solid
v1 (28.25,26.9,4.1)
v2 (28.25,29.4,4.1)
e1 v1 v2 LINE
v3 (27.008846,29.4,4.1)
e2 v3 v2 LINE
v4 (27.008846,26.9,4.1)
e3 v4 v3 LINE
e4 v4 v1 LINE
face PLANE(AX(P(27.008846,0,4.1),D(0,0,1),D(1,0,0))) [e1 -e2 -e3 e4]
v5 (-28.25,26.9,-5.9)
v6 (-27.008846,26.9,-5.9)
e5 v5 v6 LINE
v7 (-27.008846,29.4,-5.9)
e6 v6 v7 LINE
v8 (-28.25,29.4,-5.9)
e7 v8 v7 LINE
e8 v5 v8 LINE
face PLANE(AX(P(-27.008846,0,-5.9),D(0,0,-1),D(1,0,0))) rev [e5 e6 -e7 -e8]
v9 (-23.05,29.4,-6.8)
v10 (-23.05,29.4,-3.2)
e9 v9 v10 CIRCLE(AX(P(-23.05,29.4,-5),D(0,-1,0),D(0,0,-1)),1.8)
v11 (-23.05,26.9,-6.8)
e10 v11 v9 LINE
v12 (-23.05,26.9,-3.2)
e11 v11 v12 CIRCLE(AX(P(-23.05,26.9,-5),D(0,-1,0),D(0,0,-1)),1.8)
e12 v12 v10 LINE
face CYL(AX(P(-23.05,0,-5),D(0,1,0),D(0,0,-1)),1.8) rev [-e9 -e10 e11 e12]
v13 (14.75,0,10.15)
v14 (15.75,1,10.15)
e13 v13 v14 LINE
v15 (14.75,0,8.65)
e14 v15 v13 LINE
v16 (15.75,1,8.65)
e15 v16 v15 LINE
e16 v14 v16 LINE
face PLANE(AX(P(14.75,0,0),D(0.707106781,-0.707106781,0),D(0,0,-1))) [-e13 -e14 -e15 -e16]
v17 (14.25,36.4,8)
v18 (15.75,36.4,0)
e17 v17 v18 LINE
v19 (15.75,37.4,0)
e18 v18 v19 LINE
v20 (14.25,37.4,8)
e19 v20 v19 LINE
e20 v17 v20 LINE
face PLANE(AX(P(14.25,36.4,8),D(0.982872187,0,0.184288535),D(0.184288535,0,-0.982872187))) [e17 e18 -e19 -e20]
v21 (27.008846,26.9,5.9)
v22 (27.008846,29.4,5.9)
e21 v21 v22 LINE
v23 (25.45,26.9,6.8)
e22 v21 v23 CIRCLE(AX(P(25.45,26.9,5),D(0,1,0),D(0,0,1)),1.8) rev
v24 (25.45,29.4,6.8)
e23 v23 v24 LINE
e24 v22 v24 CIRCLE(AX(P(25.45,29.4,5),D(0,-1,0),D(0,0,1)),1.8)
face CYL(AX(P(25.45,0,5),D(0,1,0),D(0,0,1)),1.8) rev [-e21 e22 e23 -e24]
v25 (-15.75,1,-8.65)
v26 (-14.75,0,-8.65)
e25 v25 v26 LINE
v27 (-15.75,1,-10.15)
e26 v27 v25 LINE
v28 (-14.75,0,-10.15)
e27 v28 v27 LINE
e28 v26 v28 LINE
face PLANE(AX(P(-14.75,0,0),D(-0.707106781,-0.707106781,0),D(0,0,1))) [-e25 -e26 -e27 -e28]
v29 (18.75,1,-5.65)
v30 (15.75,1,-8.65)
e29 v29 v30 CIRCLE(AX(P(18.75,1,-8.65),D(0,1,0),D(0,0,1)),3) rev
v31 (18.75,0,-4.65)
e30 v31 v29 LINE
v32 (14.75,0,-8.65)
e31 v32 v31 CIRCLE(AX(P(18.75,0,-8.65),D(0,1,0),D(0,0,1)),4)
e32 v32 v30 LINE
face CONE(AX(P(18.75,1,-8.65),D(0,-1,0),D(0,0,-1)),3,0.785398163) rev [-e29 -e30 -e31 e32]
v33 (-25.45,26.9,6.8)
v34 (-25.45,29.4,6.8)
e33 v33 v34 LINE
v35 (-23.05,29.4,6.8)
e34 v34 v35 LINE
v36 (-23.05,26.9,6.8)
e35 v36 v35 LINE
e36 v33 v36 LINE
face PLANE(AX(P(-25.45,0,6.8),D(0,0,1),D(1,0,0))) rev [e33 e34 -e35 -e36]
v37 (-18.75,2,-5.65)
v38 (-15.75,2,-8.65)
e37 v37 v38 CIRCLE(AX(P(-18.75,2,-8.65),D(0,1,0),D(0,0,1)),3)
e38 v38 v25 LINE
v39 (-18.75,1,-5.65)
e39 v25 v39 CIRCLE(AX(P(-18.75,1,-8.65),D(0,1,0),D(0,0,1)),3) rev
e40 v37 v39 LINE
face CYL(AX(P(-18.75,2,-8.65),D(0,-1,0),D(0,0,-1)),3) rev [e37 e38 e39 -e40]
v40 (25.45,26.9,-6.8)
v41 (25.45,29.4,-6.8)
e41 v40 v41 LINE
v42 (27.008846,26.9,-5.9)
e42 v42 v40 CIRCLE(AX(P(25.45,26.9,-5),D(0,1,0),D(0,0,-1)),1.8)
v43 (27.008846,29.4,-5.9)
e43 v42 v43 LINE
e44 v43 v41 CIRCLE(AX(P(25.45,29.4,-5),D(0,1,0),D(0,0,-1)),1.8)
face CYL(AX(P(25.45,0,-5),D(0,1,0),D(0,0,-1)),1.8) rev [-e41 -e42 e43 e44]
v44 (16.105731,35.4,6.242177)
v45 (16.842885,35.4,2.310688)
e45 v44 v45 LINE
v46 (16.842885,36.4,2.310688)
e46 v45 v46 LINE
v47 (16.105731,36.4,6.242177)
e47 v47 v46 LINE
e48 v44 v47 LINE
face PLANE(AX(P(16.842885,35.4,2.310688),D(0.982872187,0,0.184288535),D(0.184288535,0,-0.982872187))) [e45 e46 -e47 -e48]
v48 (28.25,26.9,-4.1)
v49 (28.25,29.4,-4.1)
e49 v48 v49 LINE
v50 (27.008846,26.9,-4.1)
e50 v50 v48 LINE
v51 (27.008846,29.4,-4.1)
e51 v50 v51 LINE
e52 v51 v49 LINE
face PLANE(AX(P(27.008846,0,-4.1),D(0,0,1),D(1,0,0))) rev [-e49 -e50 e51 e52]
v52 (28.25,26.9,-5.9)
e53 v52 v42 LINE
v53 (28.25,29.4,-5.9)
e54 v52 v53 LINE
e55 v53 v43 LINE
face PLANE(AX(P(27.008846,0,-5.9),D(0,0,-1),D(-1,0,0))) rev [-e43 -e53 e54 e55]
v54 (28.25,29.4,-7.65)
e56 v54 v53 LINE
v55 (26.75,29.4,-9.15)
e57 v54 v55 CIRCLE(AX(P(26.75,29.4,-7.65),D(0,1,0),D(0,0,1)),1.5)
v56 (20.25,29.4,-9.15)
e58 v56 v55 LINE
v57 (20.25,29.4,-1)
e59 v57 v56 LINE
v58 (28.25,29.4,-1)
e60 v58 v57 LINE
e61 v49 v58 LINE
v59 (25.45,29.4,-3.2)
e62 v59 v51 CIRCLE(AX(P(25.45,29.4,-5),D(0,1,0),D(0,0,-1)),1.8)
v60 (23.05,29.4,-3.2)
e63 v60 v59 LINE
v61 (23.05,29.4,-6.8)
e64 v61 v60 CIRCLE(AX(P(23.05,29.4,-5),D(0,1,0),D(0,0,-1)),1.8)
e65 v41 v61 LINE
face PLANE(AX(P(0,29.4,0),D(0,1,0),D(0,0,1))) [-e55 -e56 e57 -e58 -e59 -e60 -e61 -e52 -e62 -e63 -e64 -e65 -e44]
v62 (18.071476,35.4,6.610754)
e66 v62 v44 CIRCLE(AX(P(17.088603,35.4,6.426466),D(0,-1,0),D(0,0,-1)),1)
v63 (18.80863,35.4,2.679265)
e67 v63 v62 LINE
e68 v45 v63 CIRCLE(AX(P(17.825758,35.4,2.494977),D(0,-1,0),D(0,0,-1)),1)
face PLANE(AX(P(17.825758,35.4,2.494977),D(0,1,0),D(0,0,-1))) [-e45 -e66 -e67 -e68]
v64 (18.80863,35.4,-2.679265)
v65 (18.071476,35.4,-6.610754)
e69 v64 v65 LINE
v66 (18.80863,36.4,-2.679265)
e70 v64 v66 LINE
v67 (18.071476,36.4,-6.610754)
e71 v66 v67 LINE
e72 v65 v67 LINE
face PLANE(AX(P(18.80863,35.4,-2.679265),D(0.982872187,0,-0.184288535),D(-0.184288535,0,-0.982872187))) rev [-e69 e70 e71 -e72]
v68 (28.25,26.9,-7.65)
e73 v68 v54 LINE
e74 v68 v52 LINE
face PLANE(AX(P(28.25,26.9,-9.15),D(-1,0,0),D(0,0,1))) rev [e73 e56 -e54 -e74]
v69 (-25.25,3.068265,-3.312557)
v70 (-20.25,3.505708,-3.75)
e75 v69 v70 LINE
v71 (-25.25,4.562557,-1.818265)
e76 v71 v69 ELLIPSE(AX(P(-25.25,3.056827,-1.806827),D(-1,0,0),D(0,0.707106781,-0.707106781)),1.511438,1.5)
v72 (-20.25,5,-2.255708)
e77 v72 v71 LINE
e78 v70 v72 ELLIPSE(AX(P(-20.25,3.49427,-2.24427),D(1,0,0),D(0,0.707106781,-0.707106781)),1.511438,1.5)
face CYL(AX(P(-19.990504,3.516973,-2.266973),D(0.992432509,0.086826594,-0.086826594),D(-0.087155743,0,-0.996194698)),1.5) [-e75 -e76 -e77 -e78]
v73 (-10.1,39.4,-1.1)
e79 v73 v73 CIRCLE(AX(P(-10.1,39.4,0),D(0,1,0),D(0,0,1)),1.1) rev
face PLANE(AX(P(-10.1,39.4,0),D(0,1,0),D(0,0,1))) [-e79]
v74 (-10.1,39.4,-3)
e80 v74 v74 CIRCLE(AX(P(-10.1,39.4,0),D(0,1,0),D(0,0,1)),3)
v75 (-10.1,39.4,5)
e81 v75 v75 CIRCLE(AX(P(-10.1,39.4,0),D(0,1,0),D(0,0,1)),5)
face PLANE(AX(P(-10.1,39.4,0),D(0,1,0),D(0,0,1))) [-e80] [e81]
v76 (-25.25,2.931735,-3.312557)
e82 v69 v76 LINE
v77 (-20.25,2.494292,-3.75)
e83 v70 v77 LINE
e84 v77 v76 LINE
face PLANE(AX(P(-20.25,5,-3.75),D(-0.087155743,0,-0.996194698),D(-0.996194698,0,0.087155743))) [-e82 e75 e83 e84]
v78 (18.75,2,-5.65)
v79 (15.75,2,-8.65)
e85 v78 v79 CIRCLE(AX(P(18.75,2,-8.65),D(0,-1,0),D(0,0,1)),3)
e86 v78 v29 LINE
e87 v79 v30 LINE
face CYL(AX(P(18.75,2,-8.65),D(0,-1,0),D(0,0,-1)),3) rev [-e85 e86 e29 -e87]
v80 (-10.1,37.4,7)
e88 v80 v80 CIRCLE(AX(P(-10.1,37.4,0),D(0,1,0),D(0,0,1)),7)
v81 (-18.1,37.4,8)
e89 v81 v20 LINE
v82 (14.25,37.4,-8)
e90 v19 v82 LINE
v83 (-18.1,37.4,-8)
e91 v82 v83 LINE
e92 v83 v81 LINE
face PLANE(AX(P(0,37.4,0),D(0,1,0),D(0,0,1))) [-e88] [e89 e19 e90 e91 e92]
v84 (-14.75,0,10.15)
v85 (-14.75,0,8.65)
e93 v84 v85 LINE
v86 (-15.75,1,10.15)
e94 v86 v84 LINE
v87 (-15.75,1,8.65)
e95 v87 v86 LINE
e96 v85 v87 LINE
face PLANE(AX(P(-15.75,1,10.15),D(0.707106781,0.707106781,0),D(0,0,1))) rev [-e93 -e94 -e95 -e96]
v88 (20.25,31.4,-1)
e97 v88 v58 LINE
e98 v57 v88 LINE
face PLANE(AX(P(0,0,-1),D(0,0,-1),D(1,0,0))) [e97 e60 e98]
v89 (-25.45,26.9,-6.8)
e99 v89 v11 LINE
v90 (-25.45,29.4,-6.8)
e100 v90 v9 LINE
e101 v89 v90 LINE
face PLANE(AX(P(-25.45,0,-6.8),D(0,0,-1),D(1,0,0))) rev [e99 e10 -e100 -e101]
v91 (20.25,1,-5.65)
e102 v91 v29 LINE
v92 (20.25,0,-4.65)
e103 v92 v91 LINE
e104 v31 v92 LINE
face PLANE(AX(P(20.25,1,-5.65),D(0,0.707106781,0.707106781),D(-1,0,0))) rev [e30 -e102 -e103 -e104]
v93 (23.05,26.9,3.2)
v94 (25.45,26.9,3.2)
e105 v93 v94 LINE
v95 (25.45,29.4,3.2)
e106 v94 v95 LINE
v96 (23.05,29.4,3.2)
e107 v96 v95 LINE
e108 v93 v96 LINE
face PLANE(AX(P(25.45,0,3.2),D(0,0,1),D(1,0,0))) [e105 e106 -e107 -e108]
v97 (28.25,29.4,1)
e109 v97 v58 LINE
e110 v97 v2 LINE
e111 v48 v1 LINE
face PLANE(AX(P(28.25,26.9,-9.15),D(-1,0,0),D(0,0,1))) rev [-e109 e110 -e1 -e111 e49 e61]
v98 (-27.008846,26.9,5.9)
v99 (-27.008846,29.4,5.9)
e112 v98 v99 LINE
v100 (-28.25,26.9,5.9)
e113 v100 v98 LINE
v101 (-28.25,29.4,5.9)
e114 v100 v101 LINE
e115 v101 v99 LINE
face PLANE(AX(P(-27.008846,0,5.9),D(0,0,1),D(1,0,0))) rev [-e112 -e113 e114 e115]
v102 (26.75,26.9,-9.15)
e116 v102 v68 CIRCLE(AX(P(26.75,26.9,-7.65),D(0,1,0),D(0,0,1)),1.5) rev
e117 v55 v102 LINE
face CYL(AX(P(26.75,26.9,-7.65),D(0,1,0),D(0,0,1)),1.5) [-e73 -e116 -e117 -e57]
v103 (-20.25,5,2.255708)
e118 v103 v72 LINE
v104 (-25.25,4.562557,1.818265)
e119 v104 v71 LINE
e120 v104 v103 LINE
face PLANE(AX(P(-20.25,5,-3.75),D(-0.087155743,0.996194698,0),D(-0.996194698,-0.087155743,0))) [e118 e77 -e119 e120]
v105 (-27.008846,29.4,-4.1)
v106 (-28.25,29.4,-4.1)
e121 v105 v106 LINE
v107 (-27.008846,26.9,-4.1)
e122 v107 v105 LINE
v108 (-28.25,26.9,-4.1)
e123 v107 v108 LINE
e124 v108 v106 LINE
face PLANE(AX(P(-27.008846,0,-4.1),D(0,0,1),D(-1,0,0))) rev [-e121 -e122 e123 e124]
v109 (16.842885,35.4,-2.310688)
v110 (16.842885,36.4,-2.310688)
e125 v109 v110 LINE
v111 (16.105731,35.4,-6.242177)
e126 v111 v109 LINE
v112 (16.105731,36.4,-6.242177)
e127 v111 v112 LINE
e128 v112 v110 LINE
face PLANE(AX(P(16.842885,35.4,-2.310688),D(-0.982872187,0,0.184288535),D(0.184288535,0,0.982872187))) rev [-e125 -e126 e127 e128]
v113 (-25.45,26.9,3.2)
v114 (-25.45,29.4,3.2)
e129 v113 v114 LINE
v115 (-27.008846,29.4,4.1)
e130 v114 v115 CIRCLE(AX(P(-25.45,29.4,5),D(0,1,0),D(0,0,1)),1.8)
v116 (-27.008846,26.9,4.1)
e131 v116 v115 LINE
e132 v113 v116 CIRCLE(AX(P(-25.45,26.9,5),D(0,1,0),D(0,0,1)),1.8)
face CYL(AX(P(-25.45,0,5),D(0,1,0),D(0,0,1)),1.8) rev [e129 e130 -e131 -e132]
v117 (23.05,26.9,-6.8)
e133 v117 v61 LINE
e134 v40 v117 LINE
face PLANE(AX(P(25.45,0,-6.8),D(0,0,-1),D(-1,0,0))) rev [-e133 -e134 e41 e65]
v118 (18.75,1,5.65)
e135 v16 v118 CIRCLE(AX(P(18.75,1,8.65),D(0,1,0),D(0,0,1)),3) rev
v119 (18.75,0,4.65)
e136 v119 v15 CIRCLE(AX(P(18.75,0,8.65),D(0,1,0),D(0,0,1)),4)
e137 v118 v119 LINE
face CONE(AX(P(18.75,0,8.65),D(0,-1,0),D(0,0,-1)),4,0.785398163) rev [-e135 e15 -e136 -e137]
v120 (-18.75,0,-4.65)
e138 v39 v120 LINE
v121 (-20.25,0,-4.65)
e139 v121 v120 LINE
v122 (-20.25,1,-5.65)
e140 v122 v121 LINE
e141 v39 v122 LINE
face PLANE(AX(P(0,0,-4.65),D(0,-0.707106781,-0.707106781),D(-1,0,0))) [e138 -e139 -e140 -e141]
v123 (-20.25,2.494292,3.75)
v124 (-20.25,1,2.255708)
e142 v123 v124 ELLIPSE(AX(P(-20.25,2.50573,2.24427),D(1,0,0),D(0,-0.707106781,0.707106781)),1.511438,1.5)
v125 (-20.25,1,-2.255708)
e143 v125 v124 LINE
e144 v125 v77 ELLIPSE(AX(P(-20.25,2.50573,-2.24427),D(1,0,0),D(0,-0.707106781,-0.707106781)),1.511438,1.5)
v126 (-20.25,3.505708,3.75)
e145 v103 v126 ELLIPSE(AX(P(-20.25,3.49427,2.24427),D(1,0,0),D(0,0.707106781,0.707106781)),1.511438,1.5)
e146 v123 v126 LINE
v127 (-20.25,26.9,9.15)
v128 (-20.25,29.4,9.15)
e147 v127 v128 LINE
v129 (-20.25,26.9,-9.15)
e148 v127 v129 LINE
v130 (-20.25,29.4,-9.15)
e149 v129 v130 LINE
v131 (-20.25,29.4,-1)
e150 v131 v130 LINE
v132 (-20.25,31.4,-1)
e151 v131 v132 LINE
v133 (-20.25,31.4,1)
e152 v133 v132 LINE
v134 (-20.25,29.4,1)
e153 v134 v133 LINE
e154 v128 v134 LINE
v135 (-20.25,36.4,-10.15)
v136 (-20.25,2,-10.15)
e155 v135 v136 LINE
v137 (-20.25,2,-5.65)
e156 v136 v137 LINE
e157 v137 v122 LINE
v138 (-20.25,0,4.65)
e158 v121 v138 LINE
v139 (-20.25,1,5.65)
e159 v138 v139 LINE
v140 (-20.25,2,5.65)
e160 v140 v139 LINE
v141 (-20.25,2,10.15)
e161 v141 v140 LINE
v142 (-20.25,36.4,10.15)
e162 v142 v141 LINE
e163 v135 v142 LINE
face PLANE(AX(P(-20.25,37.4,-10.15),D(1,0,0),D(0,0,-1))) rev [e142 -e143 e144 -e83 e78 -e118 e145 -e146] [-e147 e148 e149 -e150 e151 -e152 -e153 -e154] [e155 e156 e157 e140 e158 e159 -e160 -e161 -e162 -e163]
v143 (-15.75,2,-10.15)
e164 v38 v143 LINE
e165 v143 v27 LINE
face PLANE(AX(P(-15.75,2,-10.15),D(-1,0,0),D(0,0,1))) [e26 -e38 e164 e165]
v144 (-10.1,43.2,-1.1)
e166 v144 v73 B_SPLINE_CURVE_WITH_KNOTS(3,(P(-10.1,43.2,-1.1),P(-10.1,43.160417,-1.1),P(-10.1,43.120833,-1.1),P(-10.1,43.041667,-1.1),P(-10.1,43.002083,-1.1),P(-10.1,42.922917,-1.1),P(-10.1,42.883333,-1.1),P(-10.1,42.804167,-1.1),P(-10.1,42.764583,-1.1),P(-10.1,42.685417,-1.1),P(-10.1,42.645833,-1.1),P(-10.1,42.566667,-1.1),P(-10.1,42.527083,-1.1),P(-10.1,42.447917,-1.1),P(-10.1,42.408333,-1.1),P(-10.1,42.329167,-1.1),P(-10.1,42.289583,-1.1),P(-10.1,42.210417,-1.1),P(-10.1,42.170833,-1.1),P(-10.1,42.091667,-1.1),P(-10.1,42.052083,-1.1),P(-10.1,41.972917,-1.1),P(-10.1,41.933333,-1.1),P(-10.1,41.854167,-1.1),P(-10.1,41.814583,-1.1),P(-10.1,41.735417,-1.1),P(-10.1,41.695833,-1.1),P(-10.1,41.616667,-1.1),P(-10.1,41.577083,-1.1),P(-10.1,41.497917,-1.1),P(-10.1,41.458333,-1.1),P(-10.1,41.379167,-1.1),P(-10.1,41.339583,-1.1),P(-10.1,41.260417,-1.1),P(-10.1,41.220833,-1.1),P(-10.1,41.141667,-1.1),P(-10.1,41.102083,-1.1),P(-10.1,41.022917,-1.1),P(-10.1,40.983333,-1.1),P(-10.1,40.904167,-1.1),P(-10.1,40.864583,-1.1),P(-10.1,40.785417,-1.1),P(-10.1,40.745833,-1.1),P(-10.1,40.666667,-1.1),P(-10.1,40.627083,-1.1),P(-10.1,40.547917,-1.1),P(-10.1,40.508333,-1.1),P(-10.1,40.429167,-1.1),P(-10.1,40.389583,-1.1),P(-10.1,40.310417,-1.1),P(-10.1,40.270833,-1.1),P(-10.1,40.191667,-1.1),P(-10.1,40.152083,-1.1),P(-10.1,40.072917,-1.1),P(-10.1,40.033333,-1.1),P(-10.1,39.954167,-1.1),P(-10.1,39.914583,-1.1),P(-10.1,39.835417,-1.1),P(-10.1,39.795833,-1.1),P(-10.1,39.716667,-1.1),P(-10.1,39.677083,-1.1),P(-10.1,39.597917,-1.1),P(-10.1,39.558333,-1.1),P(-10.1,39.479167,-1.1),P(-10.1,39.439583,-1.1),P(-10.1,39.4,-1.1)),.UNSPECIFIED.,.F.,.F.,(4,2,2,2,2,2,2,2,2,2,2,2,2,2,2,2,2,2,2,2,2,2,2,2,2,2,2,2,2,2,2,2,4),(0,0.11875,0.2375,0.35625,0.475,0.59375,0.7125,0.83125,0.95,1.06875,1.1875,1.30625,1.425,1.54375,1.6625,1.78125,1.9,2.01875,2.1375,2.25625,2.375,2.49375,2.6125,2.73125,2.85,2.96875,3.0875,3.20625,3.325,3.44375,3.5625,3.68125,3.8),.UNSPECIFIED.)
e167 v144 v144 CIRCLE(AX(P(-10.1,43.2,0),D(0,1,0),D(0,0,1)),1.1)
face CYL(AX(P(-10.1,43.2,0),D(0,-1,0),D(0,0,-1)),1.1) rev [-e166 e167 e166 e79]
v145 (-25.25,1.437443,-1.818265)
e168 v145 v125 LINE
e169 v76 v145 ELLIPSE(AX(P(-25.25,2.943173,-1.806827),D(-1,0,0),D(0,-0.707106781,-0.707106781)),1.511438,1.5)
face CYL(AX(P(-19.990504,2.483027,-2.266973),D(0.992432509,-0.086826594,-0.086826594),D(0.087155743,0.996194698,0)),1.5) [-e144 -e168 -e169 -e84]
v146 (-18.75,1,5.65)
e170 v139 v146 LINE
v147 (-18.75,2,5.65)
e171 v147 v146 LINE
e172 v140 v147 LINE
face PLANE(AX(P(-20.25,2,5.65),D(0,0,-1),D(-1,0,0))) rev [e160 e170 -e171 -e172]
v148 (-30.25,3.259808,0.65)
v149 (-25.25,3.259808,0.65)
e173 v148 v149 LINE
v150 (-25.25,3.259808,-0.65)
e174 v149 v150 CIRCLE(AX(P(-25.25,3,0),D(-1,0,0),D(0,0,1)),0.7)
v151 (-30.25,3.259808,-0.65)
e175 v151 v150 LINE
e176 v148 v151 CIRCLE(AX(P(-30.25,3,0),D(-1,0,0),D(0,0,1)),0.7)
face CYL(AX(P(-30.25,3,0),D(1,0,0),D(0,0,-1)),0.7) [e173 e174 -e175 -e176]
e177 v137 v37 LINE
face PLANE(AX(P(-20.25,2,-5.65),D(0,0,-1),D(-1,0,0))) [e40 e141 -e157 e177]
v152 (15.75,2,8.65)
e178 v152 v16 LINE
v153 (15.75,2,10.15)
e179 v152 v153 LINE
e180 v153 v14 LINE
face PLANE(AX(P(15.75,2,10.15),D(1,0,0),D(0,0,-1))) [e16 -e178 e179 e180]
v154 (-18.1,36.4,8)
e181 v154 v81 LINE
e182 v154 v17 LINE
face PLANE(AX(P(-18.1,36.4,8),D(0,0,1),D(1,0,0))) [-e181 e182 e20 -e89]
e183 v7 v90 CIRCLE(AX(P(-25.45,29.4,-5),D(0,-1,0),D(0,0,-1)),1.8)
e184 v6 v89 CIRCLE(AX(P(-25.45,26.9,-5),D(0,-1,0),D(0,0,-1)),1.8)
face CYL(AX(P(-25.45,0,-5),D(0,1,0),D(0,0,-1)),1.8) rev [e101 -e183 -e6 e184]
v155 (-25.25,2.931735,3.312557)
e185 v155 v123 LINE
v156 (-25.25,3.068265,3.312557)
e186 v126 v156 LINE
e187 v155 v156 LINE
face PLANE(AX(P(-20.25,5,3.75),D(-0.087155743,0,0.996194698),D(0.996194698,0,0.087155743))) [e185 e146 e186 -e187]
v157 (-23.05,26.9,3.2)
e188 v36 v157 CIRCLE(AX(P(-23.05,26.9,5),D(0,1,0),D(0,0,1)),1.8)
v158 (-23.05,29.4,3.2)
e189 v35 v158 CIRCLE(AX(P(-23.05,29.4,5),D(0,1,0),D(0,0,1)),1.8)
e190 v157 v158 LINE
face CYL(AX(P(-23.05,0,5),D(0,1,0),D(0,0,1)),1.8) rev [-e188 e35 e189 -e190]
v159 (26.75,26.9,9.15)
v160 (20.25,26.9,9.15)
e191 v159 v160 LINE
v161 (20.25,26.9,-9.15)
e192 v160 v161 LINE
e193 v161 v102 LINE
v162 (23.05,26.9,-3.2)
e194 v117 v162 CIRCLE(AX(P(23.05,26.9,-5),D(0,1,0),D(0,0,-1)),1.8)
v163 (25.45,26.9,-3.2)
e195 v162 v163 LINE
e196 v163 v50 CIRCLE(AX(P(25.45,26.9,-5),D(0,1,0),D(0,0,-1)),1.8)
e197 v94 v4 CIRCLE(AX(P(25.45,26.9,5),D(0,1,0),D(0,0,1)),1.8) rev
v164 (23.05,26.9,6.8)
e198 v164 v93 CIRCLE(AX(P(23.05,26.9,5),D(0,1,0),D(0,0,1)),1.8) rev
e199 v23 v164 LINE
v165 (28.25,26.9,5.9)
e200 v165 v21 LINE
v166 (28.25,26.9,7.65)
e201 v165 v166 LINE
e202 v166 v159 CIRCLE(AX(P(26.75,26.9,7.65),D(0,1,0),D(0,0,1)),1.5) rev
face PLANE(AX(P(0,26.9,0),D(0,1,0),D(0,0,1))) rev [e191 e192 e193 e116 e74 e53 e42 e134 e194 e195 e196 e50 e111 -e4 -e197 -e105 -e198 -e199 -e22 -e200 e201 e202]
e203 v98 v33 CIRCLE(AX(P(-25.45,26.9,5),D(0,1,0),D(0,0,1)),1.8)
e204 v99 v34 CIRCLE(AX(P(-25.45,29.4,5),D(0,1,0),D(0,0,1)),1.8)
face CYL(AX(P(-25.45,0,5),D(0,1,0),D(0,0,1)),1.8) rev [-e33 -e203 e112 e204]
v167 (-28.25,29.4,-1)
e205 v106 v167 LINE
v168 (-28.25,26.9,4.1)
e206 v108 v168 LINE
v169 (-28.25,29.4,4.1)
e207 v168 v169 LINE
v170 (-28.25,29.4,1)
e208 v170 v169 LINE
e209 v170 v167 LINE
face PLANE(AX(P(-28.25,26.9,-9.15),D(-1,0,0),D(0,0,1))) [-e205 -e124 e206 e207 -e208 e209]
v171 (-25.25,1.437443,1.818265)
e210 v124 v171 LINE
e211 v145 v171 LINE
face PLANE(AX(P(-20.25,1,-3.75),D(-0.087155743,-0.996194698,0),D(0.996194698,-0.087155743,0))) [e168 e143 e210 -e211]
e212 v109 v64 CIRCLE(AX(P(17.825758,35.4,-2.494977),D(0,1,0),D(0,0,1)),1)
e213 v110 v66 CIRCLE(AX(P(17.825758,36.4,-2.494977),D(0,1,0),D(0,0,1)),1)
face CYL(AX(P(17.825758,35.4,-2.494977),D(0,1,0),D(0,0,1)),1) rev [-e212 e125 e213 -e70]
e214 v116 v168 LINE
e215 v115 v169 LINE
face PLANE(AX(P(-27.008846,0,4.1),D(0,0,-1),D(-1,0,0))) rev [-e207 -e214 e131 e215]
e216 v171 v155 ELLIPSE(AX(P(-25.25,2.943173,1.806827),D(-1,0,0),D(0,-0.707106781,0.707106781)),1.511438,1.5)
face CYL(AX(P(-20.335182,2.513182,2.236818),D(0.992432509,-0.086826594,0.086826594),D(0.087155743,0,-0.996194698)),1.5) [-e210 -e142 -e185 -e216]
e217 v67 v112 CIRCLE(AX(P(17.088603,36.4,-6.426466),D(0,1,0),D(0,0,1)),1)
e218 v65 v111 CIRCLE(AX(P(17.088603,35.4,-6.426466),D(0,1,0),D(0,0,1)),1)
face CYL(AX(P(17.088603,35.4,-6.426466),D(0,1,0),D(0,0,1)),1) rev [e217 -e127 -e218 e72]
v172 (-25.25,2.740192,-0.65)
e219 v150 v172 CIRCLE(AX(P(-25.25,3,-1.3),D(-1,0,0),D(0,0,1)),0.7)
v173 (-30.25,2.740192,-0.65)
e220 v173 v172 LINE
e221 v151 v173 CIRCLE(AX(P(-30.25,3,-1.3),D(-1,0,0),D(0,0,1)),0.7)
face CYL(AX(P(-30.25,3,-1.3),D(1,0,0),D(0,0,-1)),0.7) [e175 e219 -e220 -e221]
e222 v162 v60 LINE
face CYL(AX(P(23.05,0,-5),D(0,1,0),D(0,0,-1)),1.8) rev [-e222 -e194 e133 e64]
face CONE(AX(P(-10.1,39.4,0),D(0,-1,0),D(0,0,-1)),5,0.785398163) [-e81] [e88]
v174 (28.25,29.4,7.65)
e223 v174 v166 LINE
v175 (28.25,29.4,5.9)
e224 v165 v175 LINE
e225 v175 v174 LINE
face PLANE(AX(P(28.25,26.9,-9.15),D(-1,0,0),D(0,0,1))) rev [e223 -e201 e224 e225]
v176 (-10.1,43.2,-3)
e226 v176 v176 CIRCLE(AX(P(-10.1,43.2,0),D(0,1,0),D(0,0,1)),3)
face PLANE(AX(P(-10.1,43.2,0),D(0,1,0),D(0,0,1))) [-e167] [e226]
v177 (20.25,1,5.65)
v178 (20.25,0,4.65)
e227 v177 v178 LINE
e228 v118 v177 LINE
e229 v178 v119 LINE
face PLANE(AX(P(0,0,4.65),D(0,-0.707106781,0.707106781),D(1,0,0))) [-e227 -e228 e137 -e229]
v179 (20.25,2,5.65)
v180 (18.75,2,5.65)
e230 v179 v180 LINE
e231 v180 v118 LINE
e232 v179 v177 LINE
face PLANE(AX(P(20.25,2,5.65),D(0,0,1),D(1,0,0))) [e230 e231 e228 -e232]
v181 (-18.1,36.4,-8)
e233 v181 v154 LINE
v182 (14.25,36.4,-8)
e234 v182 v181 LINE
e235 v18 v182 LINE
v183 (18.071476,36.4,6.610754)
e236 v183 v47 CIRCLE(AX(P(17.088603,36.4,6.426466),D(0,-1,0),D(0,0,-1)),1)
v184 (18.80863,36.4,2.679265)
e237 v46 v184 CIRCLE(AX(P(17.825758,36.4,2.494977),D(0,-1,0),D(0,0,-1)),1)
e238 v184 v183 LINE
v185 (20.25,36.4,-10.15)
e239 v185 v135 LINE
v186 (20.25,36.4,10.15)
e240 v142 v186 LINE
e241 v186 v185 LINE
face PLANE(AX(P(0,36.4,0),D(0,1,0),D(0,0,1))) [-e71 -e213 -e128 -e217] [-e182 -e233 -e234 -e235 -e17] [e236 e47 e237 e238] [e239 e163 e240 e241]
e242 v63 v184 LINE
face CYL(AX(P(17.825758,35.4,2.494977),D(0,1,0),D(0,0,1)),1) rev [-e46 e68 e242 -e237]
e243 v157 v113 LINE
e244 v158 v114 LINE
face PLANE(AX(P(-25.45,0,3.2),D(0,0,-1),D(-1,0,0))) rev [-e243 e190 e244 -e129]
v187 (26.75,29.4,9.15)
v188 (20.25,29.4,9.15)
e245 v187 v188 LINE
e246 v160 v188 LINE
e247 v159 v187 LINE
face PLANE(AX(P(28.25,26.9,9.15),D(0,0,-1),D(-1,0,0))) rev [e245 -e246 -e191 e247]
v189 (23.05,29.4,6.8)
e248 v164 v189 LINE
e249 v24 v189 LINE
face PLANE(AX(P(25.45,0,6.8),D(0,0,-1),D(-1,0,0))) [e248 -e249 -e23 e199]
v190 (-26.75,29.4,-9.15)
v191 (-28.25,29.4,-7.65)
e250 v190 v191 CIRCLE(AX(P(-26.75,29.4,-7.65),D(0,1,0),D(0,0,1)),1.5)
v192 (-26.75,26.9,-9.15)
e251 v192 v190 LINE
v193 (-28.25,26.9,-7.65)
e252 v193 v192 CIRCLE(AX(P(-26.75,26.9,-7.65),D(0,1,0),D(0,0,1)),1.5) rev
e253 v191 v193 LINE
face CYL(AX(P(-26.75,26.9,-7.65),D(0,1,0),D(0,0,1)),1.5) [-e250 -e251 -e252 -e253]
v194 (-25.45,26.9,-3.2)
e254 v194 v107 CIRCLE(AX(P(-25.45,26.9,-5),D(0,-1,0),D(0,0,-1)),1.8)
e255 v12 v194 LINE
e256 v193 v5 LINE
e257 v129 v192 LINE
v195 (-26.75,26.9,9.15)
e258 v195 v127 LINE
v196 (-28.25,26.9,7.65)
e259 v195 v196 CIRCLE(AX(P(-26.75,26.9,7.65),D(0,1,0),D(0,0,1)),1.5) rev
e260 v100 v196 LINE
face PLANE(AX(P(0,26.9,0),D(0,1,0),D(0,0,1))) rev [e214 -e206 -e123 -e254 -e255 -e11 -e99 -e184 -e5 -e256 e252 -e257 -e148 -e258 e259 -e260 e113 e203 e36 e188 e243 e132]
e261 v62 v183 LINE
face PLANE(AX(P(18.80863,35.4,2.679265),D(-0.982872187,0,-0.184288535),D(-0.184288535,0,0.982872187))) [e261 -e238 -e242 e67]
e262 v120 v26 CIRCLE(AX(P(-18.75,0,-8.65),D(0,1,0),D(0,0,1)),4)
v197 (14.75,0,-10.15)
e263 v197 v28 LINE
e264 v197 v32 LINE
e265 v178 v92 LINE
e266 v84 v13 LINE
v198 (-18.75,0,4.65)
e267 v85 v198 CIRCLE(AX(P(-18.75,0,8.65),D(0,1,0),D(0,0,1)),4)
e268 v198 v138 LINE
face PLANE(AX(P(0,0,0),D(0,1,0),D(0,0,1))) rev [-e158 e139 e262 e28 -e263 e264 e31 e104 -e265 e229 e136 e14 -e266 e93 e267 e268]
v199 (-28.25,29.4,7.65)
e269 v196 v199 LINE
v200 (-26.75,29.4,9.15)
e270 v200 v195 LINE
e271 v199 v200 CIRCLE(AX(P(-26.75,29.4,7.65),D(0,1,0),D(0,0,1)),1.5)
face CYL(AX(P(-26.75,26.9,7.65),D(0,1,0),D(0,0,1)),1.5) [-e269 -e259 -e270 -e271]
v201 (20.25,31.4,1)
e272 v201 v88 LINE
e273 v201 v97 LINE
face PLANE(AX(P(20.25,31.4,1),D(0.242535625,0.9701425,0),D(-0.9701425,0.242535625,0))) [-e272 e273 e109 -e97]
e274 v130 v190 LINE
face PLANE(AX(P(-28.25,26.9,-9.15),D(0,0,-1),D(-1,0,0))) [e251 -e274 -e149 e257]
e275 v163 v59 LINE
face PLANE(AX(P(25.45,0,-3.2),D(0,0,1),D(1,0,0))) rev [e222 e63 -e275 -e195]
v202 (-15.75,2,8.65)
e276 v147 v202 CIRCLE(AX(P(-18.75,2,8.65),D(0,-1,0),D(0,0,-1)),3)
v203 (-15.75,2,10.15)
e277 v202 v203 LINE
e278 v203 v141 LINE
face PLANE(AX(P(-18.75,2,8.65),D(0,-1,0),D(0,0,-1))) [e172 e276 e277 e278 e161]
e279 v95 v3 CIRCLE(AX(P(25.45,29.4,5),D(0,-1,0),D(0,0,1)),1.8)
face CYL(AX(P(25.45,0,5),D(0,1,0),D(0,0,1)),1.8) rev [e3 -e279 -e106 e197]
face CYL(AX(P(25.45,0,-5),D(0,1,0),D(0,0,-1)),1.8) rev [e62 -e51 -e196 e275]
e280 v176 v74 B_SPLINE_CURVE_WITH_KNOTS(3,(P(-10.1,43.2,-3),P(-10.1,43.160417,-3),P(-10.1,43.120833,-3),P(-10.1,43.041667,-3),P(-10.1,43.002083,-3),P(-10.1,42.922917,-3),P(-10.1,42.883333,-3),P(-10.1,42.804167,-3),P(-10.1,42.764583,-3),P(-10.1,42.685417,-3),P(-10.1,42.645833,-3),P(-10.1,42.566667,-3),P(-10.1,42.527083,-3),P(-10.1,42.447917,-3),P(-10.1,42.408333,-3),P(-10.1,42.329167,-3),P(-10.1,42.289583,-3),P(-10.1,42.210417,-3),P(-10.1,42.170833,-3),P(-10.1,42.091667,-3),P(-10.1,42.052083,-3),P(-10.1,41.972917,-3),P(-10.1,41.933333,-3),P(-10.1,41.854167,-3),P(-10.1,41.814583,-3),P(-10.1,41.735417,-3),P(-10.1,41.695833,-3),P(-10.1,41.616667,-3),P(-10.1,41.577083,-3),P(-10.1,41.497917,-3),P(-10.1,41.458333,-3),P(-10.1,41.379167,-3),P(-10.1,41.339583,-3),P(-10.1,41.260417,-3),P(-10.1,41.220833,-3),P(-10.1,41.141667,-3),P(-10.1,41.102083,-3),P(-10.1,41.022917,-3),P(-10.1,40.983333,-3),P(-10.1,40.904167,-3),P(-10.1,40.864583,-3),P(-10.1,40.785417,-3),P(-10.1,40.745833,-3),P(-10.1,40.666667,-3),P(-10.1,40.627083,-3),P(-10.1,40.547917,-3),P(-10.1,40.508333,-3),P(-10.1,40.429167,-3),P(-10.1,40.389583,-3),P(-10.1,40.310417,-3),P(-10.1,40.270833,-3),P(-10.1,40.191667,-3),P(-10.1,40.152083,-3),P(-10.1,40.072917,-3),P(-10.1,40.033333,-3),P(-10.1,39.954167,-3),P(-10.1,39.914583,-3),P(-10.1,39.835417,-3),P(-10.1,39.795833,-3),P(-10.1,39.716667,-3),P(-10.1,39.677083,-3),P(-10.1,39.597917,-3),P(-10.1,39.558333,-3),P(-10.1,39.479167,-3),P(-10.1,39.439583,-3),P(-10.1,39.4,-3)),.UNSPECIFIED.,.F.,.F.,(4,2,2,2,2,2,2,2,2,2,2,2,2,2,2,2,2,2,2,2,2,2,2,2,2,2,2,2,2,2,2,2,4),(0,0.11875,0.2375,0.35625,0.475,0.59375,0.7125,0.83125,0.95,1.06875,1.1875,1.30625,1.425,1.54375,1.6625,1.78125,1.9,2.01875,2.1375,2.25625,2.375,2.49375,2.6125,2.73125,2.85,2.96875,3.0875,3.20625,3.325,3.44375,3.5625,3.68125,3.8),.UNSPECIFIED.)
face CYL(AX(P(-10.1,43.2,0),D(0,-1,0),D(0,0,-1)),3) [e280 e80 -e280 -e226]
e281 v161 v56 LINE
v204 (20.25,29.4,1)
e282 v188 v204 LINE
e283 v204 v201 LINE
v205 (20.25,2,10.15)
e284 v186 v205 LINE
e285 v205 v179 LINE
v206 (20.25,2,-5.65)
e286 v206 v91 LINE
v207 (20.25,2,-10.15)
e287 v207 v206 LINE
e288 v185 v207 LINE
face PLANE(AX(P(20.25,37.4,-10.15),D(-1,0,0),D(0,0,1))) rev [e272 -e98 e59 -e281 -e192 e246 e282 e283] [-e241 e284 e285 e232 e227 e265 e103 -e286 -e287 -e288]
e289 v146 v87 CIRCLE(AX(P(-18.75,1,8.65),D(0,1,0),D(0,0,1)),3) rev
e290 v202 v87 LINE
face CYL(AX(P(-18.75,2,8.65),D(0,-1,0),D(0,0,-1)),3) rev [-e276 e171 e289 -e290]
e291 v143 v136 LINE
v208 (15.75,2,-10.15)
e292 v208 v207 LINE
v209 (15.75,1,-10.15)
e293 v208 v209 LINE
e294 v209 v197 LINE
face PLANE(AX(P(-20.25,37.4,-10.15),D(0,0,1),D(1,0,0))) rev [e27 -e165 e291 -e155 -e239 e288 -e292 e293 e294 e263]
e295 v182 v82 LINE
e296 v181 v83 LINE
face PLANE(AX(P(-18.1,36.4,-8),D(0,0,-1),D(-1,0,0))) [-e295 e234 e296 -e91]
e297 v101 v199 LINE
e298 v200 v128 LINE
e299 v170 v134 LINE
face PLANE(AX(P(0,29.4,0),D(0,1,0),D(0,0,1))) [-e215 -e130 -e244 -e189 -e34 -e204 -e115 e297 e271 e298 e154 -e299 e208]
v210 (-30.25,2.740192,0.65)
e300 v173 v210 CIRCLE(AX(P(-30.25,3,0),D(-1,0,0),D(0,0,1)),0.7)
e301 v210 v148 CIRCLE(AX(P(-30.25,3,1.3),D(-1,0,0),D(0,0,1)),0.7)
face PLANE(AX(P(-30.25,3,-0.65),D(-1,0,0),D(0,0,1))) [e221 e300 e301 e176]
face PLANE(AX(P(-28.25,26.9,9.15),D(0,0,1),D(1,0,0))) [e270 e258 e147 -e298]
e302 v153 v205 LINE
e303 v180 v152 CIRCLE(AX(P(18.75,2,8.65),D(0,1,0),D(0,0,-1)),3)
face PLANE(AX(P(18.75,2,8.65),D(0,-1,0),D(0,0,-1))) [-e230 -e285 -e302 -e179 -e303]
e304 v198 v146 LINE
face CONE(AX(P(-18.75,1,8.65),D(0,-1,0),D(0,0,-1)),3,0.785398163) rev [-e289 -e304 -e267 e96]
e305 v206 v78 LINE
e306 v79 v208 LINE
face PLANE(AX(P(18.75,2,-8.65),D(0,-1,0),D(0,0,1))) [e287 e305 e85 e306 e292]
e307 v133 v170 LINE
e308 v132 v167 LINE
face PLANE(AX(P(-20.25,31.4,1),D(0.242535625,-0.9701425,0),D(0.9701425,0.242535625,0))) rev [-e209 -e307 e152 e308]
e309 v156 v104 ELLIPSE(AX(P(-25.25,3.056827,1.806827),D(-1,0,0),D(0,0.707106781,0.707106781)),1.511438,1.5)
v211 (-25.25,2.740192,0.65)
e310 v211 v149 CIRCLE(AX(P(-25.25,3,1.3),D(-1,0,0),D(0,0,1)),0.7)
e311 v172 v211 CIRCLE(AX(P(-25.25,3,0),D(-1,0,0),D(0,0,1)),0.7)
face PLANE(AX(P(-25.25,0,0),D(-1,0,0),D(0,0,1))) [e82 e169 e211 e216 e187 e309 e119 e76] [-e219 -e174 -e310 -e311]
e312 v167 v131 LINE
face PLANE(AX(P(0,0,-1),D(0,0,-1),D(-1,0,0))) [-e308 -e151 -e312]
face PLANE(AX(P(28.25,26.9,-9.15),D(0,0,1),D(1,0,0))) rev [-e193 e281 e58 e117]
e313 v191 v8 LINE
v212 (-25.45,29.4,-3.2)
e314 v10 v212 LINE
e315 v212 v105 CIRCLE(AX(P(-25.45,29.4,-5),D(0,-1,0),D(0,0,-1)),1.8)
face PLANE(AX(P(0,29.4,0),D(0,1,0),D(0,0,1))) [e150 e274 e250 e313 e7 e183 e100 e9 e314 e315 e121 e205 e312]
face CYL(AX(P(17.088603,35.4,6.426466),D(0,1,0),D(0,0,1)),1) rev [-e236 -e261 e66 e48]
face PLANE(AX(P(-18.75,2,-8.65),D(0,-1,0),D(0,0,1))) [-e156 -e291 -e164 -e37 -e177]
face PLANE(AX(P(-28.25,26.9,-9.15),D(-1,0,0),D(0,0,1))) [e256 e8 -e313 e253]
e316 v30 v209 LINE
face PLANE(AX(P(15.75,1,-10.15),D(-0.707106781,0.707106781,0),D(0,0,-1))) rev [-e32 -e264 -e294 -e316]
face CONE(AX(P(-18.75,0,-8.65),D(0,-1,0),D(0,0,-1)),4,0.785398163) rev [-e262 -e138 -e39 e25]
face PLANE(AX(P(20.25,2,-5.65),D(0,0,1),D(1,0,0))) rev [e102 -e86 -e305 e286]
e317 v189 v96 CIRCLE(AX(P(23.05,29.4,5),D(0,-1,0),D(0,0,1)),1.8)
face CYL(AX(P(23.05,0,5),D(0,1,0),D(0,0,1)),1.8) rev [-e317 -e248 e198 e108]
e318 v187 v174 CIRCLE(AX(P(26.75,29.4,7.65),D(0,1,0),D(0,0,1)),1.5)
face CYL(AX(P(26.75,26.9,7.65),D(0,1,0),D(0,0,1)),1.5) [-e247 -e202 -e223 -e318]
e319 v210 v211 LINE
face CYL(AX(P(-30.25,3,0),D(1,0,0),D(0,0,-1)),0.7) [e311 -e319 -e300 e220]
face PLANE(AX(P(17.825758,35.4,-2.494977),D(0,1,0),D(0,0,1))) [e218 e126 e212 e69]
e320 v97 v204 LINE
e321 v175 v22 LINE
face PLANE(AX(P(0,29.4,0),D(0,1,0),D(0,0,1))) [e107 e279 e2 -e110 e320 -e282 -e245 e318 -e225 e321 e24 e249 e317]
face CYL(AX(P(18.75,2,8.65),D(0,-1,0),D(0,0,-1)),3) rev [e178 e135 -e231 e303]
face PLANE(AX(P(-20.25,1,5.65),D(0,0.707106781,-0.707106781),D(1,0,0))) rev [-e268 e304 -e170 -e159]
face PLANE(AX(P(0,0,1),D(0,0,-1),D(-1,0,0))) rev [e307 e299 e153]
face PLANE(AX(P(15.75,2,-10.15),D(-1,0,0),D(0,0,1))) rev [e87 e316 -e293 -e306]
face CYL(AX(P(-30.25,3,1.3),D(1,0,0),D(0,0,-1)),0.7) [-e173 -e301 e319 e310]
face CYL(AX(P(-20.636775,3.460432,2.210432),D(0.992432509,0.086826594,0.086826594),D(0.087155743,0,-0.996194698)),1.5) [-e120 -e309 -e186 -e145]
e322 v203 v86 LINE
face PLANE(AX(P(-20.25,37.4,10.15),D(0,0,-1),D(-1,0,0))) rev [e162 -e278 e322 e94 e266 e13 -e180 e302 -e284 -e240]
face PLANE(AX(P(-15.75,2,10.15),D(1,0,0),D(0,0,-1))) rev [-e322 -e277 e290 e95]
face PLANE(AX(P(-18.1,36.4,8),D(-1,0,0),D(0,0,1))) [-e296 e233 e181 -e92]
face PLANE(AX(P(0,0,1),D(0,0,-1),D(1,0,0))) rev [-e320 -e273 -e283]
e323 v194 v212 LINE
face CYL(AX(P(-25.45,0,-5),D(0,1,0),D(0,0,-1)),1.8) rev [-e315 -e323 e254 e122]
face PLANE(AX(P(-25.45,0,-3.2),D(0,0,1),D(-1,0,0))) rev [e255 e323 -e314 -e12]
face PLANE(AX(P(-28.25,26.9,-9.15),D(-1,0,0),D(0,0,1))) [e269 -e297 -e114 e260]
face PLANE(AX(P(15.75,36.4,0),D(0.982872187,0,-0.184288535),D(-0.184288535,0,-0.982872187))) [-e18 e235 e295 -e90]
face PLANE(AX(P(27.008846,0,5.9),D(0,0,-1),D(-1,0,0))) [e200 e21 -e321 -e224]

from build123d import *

# Parameters (mm, degrees)
SKETCH1_W                = 40.5
SKETCH1_H                = 20.3
BOSS_EXTRUDE1_DEPTH      = 37.4
SKETCH2_R                = 7
BOSS_EXTRUDE2_DEPTH      = 2
CHAMFER1_SIZE            = 2
SKETCH3_R                = 3
SKETCH3_R_2              = 1.1
BOSS_EXTRUDE3_DEPTH      = 3.8
SKETCH4_W                = 8
SKETCH4_H                = 18.3
BOSS_EXTRUDE4_DEPTH      = 2.5
CUT_EXTRUDE1_DEPTH       = 43.01719886
BOSS_EXTRUDE5_DEPTH      = 1
MIRROR3_COPY_1_DEPTH     = 43.01719886
FILLET2_R                = 1.5
SKETCH7_W                = 7.5
SKETCH7_H                = 4
BOSS_EXTRUDE6_DEPTH      = 5
BOSS_EXTRUDE7_DEPTH      = 5
DRAFT1_ANGLE             = 5
FILLET3_R                = 1.5
CUT_EXTRUDE2_DEPTH       = 2
CHAMFER2_SIZE            = 1
CHAMFER2_OF_MIRROR4_SIZE = 1
MIRROR5_START            = 18.75
MIRROR5_3_DEPTH          = 2.25
MIRROR5_START_2          = -11
MIRROR5_4_DEPTH          = 2.35
MIRROR5_START_3          = 8.65
MIRROR5_5_DEPTH          = 2.35
SKETCH10_W               = 40.5
SKETCH10_H               = 20.3
CUT_EXTRUDE3_DEPTH       = 1
CUT_EXTRUDE4_DEPTH       = 1


with BuildPart() as part:
    # Sketch1 → Boss-Extrude1 (new body)
    with BuildSketch(Plane(origin=(0, 0, 0), x_dir=(1, 0, 0), z_dir=(0, 1, 0))):
        Rectangle(SKETCH1_W, SKETCH1_H)
    extrude(amount=BOSS_EXTRUDE1_DEPTH)

    # Sketch2 → Boss-Extrude2 (add)
    with BuildSketch(Plane(origin=(0, 37.4, 0), x_dir=(1, 0, 0), z_dir=(0, 1, 0))):
        with Locations(Location((-10.1, 0, 0), (0, 0, 270))):
            Circle(SKETCH2_R)
    extrude(amount=BOSS_EXTRUDE2_DEPTH)

    # Chamfer1
    chamfer1_edges = [part.edges().sort_by_distance(p)[0] for p in [
        (-10.1, 39.4, -7),
    ]]
    chamfer(chamfer1_edges, length=CHAMFER1_SIZE - 0.0001)  # a hair under: the kernel refuses the full size

    # Sketch3 → Boss-Extrude3 (add)
    with BuildSketch(Plane(origin=(0, 39.4, 0), x_dir=(1, 0, 0), z_dir=(0, 1, 0))):
        with Locations(Location((-10.1, 0, 0), (0, 0, 90))):
            Circle(SKETCH3_R)
        with Locations(Location((-10.1, 0, 0), (0, 0, 90))):
            Circle(SKETCH3_R_2, mode=Mode.SUBTRACT)
    extrude(amount=BOSS_EXTRUDE3_DEPTH)

    # Sketch4 → Boss-Extrude4 (add)
    with BuildSketch(Plane(origin=(0, 29.4, 0), x_dir=(1, 0, 0), z_dir=(0, 1, 0))):
        with Locations((-24.25, 0)):
            Rectangle(SKETCH4_W, SKETCH4_H)
    boss_extrude4 = extrude(amount=-BOSS_EXTRUDE4_DEPTH)

    # Sketch5 → Cut-Extrude1 (cut, through all)
    with BuildSketch(Plane(origin=(0, 29.4, 0), x_dir=(1, 0, 0), z_dir=(0, 1, 0))):
        with BuildLine():
            Line((-25.45, -3.2), (-23.05, -3.2))
            ThreePointArc((-23.05, -3.2), (-21.25, -5), (-23.05, -6.8))
            Line((-23.05, -6.8), (-25.45, -6.8))
            ThreePointArc((-25.45, -6.8), (-26.35, -6.558845727), (-27.008845727, -5.9))
            Line((-27.008845727, -5.9), (-28.25, -5.9))
            Line((-28.25, -5.9), (-28.25, -4.1))
            Line((-28.25, -4.1), (-27.008845727, -4.1))
            ThreePointArc((-27.008845727, -4.1), (-26.35, -3.441154273), (-25.45, -3.2))
        make_face()
    cut_extrude1 = extrude(amount=-CUT_EXTRUDE1_DEPTH, mode=Mode.SUBTRACT)

    # Mirror2: Cut-Extrude1 across plane
    add(cut_extrude1.mirror(Plane.XY), mode=Mode.SUBTRACT)

    # Sketch6 → Boss-Extrude5 (add, symmetric)
    with BuildSketch(Plane.XY):
        Polygon((-28.25, 29.4), (-20.25, 29.4), (-20.25, 31.4), align=None)
    boss_extrude5 = extrude(amount=BOSS_EXTRUDE5_DEPTH, both=True)

    # Mirror3: Boss-Extrude4, Cut-Extrude1, Boss-Extrude5 across plane
    add(boss_extrude4.mirror(Plane(origin=(0, 0, 0), x_dir=(0, 0, 1), z_dir=(1, 0, 0))))
    add(cut_extrude1.mirror(Plane(origin=(0, 0, 0), x_dir=(0, 0, 1), z_dir=(1, 0, 0))), mode=Mode.SUBTRACT)
    add(boss_extrude5.mirror(Plane(origin=(0, 0, 0), x_dir=(0, 0, 1), z_dir=(1, 0, 0))))

    # Mirror3 copy 1 sketch → Mirror3 copy 1 (cut, through all)
    with BuildSketch(Plane(origin=(0, 29.4, 0), x_dir=(-1, 0, 0), z_dir=(0, 1, 0))):
        with BuildLine():
            Line((-25.45, -3.2), (-23.05, -3.2))
            ThreePointArc((-23.05, -3.2), (-21.25, -5), (-23.05, -6.8))
            Line((-23.05, -6.8), (-25.45, -6.8))
            ThreePointArc((-25.45, -6.8), (-26.35, -6.558845727), (-27.008845727, -5.9))
            Line((-27.008845727, -5.9), (-28.25, -5.9))
            Line((-28.25, -5.9), (-28.25, -4.1))
            Line((-28.25, -4.1), (-27.008845727, -4.1))
            ThreePointArc((-27.008845727, -4.1), (-26.35, -3.441154273), (-25.45, -3.2))
        make_face()
    extrude(amount=-MIRROR3_COPY_1_DEPTH, mode=Mode.SUBTRACT)

    # Fillet2
    fillet2_edges = [part.edges().sort_by_distance(p)[0] for p in [
        (28.25, 28.15, -9.15),
        (28.25, 28.15, 9.15),
        (-28.25, 28.15, 9.15),
        (-28.25, 28.15, -9.15),
    ]]
    fillet(fillet2_edges, radius=FILLET2_R)

    # Sketch7 → Boss-Extrude6 (add)
    with BuildSketch(Plane.ZY.offset(20.25)):
        with Locations((0, 3)):
            Rectangle(SKETCH7_W, SKETCH7_H)
    extrude(amount=BOSS_EXTRUDE6_DEPTH)

    # Sketch8 → Boss-Extrude7 (add)
    with BuildSketch(Plane.ZY.offset(25.25)):
        with BuildLine():
            ThreePointArc((-0.65, 3.259807621), (-2, 3), (-0.65, 2.740192379))
            ThreePointArc((-0.65, 2.740192379), (0, 2.3), (0.65, 2.740192379))
            ThreePointArc((0.65, 2.740192379), (2, 3), (0.65, 3.259807621))
            ThreePointArc((0.65, 3.259807621), (0, 3.7), (-0.65, 3.259807621))
        make_face()
    extrude(amount=BOSS_EXTRUDE7_DEPTH)

    # Draft1
    draft1_faces = [part.faces().sort_by_distance(p)[0] for p in [
        (-22.75, 1, 0),
        (-22.75, 3, -3.75),
        (-22.75, 3, 3.75),
        (-22.75, 5, 0),
    ]]
    draft(draft1_faces, Plane(origin=(-20.25, 37.4, -10.15), x_dir=(0, 0, -1), z_dir=(-1, 0, 0)), DRAFT1_ANGLE)

    # Fillet3
    fillet3_edges = [part.edges().sort_by_distance(p)[0] for p in [
        (-22.75, 4.781278341, -3.531278341),
        (-22.75, 1.218721659, -3.531278341),
        (-22.75, 1.218721659, 3.531278341),
        (-22.75, 4.781278341, 3.531278341),
    ]]
    fillet(fillet3_edges, radius=FILLET3_R)

    # Sketch9 → Cut-Extrude2 (cut)
    with BuildSketch(Plane.XZ):
        with BuildLine():
            Line((-20.25, 10.15), (-20.25, 5.65))
            Line((-20.25, 5.65), (-18.75, 5.65))
            ThreePointArc((-18.75, 5.65), (-16.628679656, 6.528679656), (-15.75, 8.65))
            Line((-15.75, 8.65), (-15.75, 10.15))
            Line((-15.75, 10.15), (-20.25, 10.15))
        make_face()
    cut_extrude2 = extrude(amount=-CUT_EXTRUDE2_DEPTH, mode=Mode.SUBTRACT)

    # Chamfer2
    chamfer2_edges = [part.edges().sort_by_distance(p)[0] for p in [
        (-19.5, 0, 5.65),
        (-16.628679656, 0, 6.528679656),
        (-15.75, 0, 9.4),
    ]]
    chamfer(chamfer2_edges, length=CHAMFER2_SIZE)

    # Mirror4: Cut-Extrude2 across plane
    add(cut_extrude2.mirror(Plane.XY), mode=Mode.SUBTRACT)

    # Chamfer2 of Mirror4
    chamfer2_of_mirror4_edges = [part.edges().sort_by_distance(p)[0] for p in [
        (-19.5, 0, -5.65),
        (-16.628679656, 0, -6.528679656),
        (-15.75, 0, -9.4),
    ]]
    chamfer(chamfer2_of_mirror4_edges, length=CHAMFER2_OF_MIRROR4_SIZE)

    # Mirror5: read off the stored shape, not the designer's step
    # Mirror5 outline → Mirror5 (revolve, cut)
    with BuildSketch(Plane(origin=(18.75, 0, -8.65), x_dir=(1, 0, 0), z_dir=(0, 0, 1))):
        Polygon((3, 1), (3, 2), (0, 2), (0, 0), (4, 0), align=None)
    revolve(axis=Axis((18.75, 0, -8.65), (0, 1, 0)), mode=Mode.SUBTRACT)

    # Mirror5 2 outline → Mirror5 2 (revolve, cut)
    with BuildSketch(Plane(origin=(18.75, 0, 8.65), x_dir=(1, 0, 0), z_dir=(0, 0, 1))):
        Polygon((3, 1), (3, 2), (0, 2), (0, 0), (4, 0), align=None)
    revolve(axis=Axis((18.75, 0, 8.65), (0, 1, 0)), mode=Mode.SUBTRACT)

    # Mirror5 3 outline → Mirror5 3 (cut)
    with BuildSketch(Plane.YZ.offset(MIRROR5_START)):
        Polygon((1, -5.65), (0, -4.65), (0, -10.15), (2, -10.15), (2, -5.65), align=None)
        Polygon((1, 5.65), (2, 5.65), (2, 10.15), (0, 10.15), (0, 4.65), align=None)
    extrude(amount=MIRROR5_3_DEPTH, mode=Mode.SUBTRACT)

    # Mirror5 4 outline → Mirror5 4 (cut)
    with BuildSketch(Plane.XY.offset(MIRROR5_START_2)):
        Polygon((15.75, 2), (15.75, 1), (14.75, 0), (20.25, 0), (20.25, 2), align=None)
    extrude(amount=MIRROR5_4_DEPTH, mode=Mode.SUBTRACT)

    # Mirror5 5 outline → Mirror5 5 (cut)
    with BuildSketch(Plane.XY.offset(MIRROR5_START_3)):
        Polygon((15.75, 2), (15.75, 1), (14.75, 0), (20.25, 0), (20.25, 2), align=None)
    extrude(amount=MIRROR5_5_DEPTH, mode=Mode.SUBTRACT)

    # Sketch10 → Cut-Extrude3 (cut)
    with BuildSketch(Plane(origin=(0, 37.4, 0), x_dir=(1, 0, 0), z_dir=(0, 1, 0))):
        Rectangle(SKETCH10_W, SKETCH10_H)
        Polygon((-18.1, -8), (14.25, -8), (15.75, 0), (14.25, 8), (-18.1, 8), align=None, mode=Mode.SUBTRACT)
    extrude(amount=-CUT_EXTRUDE3_DEPTH, mode=Mode.SUBTRACT)

    # Sketch11 → Cut-Extrude4 (cut)
    with BuildSketch(Plane(origin=(0, 36.4, 0), x_dir=(1, 0, 0), z_dir=(0, 1, 0))):
        with BuildLine():
            Line((16.842885351, 2.310688429), (16.10573121, 6.242177176))
            ThreePointArc((16.10573121, 6.242177176), (16.904314862, 7.409337898), (18.071475584, 6.610754247))
            Line((18.071475584, 6.610754247), (18.808629724, 2.679265499))
            ThreePointArc((18.808629724, 2.679265499), (18.010046072, 1.512104777), (16.842885351, 2.310688429))
        make_face()
    cut_extrude4 = extrude(amount=-CUT_EXTRUDE4_DEPTH, mode=Mode.SUBTRACT)

    # Mirror6: Cut-Extrude4 across plane
    add(cut_extrude4.mirror(Plane.XY), mode=Mode.SUBTRACT)


solid = part.part
